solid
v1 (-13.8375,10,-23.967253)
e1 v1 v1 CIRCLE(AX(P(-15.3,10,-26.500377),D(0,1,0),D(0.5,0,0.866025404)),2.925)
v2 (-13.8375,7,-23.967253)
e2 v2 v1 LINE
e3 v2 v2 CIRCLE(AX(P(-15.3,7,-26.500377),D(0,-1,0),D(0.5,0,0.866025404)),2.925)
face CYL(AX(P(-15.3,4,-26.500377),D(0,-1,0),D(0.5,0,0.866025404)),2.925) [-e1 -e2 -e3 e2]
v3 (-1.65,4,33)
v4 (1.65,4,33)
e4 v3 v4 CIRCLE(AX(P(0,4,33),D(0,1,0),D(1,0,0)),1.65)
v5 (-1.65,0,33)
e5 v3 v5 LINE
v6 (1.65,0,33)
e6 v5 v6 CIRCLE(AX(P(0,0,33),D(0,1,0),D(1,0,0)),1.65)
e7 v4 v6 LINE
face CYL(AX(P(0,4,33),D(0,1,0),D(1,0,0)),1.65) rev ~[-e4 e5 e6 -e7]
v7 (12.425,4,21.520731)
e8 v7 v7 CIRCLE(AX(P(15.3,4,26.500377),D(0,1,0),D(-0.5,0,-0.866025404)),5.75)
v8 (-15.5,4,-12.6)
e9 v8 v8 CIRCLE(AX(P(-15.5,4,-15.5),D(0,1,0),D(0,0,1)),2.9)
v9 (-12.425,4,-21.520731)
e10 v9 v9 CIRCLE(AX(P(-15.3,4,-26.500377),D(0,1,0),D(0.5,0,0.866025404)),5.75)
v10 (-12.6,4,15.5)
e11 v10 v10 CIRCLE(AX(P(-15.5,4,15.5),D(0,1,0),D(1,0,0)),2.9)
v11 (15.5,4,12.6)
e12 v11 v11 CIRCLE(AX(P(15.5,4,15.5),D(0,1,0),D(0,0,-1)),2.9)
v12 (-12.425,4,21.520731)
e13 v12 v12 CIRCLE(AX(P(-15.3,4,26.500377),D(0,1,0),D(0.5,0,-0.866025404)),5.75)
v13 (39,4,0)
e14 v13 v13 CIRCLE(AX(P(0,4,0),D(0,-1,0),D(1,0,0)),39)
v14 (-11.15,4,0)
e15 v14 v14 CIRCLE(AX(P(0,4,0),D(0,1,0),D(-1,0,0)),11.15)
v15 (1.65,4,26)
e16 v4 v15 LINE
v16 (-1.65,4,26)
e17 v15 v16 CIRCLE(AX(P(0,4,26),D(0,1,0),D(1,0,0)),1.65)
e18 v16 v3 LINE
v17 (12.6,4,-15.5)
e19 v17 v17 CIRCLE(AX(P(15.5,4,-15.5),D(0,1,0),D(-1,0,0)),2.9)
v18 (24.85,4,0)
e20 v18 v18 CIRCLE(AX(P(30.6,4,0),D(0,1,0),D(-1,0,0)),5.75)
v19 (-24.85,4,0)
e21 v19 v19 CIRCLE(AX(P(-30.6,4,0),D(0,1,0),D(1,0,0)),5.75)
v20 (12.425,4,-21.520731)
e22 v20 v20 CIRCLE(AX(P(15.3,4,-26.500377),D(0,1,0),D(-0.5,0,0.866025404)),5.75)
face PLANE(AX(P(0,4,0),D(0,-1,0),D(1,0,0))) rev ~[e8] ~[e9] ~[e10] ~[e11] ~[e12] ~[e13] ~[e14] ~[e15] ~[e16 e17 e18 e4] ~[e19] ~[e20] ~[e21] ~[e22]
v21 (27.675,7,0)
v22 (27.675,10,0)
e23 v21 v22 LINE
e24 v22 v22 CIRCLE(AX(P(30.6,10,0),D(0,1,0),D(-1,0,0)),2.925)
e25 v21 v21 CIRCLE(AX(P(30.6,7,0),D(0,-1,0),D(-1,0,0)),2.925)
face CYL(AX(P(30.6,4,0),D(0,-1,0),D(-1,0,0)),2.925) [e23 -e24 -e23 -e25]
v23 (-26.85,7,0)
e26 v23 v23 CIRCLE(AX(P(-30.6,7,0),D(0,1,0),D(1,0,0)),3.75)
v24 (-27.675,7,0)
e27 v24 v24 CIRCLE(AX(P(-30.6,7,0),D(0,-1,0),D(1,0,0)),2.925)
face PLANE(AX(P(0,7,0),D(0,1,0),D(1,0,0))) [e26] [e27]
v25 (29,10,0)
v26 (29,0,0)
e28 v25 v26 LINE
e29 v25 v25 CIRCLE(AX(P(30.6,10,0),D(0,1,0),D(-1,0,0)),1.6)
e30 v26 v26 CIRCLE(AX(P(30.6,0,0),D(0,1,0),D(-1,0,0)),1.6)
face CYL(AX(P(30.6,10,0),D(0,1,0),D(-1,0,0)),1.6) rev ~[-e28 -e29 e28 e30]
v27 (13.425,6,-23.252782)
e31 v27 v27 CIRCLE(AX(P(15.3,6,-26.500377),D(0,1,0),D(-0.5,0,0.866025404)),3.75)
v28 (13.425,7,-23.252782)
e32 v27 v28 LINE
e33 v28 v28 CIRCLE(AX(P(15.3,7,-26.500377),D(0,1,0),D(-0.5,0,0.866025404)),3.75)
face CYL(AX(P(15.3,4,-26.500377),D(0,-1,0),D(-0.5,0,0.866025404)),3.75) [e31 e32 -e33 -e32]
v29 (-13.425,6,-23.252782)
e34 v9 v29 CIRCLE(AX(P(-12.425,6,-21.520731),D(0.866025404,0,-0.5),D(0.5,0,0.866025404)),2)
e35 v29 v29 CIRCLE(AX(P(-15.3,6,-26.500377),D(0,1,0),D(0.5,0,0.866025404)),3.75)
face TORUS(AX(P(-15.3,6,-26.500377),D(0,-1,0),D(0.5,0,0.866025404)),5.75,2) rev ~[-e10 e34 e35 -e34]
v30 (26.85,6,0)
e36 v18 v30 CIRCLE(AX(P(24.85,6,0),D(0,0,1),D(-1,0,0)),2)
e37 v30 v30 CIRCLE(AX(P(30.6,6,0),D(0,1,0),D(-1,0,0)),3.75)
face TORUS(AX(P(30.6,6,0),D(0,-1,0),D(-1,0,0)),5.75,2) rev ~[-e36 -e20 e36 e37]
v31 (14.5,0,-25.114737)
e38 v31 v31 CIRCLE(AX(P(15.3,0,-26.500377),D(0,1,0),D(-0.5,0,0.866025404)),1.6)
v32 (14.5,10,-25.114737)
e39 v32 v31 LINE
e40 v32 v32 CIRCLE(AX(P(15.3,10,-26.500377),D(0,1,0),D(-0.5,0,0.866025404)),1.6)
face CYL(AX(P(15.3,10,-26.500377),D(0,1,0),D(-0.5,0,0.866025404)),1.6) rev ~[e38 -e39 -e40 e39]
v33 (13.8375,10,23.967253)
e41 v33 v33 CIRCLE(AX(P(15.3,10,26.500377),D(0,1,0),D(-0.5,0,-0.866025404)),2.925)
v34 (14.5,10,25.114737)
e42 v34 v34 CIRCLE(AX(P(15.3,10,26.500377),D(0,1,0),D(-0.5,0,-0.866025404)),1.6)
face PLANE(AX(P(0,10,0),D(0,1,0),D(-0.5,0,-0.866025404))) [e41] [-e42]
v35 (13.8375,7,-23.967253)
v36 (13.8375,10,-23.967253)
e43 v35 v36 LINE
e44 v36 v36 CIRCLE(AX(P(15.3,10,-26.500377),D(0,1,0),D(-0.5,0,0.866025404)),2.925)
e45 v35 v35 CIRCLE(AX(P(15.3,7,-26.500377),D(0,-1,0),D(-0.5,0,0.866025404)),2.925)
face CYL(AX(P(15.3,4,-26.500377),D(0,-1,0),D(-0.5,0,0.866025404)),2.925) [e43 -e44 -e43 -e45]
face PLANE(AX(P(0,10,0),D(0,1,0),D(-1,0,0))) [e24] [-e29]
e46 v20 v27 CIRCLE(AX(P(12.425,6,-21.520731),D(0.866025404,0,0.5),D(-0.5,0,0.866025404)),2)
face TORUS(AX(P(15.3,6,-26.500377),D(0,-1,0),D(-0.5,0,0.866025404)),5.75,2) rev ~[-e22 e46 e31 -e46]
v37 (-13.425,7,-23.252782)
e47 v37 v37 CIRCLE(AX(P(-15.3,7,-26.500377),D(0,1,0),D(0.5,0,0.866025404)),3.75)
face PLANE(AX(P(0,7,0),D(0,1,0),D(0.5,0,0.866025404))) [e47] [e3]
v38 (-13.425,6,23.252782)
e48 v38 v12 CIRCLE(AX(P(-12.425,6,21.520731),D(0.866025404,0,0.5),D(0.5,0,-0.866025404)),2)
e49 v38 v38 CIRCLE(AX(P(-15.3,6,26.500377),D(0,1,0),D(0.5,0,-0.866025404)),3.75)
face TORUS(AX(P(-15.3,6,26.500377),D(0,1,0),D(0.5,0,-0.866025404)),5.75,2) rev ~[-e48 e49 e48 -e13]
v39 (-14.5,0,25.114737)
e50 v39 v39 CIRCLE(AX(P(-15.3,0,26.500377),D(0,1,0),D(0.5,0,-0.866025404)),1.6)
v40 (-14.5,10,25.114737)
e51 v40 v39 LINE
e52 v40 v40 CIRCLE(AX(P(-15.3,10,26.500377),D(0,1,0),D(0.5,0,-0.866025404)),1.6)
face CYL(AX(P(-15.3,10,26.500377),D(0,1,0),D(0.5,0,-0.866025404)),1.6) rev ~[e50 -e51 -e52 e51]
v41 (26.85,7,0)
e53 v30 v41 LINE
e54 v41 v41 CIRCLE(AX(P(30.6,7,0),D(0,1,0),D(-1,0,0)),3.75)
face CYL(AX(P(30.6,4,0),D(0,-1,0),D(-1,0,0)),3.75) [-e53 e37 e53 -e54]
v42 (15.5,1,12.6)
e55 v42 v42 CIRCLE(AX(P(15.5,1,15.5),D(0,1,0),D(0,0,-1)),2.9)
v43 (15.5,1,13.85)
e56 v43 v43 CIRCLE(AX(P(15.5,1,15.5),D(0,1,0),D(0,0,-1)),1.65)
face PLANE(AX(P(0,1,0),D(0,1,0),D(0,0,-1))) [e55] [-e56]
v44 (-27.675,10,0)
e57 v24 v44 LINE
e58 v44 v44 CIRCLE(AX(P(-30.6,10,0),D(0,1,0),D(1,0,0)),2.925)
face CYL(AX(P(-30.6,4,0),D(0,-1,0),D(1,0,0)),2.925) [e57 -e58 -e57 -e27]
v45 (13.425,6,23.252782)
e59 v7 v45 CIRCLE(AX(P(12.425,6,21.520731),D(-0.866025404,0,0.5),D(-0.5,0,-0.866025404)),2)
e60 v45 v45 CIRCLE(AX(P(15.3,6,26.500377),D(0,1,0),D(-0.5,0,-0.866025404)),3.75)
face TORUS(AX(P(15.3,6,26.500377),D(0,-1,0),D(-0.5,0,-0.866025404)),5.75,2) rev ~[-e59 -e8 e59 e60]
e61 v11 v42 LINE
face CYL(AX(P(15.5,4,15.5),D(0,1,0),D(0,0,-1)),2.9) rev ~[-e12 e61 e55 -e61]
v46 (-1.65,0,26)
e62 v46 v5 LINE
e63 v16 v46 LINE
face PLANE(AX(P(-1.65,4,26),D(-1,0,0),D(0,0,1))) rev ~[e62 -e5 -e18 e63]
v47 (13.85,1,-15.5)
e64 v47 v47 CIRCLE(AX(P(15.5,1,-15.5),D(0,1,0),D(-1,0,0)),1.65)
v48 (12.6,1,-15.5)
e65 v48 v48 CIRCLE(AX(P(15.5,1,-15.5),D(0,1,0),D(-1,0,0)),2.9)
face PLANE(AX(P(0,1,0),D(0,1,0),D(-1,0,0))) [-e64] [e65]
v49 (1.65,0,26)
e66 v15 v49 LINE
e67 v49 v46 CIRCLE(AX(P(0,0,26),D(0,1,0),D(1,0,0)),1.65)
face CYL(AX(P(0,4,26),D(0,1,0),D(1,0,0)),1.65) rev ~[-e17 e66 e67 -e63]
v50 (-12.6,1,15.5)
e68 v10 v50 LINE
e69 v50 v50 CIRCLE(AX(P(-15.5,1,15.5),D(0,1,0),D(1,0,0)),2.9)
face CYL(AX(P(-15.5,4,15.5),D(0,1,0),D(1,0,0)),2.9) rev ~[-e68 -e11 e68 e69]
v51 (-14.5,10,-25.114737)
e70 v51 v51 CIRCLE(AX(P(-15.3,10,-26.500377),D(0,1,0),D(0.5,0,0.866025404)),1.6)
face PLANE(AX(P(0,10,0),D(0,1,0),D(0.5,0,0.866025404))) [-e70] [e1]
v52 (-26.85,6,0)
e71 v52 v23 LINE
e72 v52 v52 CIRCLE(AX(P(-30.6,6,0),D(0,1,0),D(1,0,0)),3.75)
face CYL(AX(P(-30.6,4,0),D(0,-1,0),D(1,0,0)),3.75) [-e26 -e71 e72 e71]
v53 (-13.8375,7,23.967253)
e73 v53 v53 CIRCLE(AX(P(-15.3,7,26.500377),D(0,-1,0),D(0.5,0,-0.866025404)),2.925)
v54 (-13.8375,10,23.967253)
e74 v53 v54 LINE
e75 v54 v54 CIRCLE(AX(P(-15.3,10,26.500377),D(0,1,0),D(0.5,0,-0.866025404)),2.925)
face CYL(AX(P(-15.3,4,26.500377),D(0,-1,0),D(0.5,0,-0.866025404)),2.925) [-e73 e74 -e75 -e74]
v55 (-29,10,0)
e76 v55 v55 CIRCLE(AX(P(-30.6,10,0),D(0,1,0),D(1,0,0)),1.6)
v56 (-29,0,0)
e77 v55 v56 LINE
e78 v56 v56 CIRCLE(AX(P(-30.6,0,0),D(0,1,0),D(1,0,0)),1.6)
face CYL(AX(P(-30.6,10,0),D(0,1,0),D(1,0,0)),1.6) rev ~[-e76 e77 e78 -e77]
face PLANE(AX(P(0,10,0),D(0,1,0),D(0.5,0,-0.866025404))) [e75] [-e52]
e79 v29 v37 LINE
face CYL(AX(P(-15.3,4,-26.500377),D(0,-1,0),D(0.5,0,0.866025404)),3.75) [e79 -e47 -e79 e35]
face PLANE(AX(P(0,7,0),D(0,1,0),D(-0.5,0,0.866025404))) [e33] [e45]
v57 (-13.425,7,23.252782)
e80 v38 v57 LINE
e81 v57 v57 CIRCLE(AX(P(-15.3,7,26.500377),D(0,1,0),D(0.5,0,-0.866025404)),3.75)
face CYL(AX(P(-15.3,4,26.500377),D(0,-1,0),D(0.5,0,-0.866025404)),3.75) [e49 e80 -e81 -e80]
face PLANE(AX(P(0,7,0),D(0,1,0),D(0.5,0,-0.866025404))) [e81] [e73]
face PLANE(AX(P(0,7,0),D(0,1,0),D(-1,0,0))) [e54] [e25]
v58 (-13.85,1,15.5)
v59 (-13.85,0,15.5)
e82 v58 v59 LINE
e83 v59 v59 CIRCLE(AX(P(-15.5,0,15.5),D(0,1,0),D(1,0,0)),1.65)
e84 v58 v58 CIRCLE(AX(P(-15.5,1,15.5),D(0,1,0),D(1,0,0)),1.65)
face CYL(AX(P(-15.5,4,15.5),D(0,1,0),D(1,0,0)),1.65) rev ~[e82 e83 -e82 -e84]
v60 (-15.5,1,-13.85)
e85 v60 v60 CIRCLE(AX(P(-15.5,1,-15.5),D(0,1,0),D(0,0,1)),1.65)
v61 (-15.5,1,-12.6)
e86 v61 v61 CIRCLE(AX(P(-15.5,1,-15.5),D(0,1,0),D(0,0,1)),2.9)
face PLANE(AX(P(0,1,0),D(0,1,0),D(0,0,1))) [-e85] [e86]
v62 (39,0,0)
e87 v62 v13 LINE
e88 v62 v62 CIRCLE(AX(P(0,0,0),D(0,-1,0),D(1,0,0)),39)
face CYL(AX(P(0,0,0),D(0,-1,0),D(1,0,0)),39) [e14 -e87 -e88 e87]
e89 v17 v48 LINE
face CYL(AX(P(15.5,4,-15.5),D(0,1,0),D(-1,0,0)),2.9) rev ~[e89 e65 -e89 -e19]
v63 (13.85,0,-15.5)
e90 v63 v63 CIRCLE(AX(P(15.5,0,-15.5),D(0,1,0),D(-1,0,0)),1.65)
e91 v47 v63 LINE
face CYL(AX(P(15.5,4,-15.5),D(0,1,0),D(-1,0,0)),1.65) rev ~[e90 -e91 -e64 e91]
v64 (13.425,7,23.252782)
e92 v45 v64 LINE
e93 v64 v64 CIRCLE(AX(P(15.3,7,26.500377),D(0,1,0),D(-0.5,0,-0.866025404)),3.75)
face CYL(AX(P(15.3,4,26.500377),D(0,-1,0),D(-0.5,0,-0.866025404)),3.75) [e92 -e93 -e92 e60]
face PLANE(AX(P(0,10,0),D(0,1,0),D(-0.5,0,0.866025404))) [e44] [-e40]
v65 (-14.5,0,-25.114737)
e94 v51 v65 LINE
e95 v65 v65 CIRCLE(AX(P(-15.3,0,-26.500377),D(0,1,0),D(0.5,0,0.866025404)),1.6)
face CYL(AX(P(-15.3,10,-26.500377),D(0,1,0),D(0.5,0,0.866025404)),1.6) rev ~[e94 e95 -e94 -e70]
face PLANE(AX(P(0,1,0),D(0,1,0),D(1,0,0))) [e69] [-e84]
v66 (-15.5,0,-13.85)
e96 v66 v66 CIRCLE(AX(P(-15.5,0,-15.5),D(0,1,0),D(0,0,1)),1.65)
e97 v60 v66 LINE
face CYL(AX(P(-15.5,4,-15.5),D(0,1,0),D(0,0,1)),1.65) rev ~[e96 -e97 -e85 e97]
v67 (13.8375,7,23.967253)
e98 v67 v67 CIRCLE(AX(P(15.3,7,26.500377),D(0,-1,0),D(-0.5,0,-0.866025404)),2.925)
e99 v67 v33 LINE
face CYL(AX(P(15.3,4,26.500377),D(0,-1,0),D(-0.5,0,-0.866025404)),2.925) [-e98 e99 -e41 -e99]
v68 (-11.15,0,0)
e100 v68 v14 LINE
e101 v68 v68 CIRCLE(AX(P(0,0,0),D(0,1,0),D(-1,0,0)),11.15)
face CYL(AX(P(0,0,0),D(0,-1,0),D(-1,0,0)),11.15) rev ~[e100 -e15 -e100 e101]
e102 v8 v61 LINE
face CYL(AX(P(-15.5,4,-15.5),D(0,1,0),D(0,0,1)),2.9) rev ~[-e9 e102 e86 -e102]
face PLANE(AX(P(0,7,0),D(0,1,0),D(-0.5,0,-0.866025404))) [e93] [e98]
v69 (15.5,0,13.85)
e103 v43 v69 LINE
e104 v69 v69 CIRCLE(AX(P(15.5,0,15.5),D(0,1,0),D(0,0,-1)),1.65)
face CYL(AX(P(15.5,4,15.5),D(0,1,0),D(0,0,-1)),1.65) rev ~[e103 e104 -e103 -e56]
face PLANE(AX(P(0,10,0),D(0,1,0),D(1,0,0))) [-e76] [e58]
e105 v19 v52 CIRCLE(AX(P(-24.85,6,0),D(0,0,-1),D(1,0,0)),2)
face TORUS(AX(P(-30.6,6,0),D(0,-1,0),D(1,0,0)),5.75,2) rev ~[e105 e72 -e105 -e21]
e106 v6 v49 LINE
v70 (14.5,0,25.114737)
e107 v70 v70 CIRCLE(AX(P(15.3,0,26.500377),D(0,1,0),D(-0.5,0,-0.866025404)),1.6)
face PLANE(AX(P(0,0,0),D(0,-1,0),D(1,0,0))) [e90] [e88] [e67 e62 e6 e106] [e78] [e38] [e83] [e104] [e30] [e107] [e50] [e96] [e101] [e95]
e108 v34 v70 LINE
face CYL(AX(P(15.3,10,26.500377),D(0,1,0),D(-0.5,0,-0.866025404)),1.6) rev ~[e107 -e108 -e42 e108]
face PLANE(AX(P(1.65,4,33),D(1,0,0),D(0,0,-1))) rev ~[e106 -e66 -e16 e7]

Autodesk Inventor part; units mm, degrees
ref_plane "YZ Plane" through (0, 0, 0) normal (1, 0, 0) x (0, 1, 0)
ref_plane "XZ Plane" through (0, 0, 0) normal (0, 1, 0) x (-1, 0, 0)
ref_plane "XY Plane" through (0, 0, 0) normal (0, 0, 1) x (1, 0, 0)
sketch "Boceto1" plane through (0, 0, 0) normal (0, 1, 0) x (-1, 0, 0)
  circle A0 centre (0, 0) radius 11.15
  line L0 (-40, 40) -> (40, 40)
  line L1 (40, 40) -> (40, -40)
  line L2 (40, -40) -> (-40, -40)
  line L3 (-40, -40) -> (-40, 40)
  line L4 (-40, 40) -> (40, -40) construction
  line L5 (40, 40) -> (-40, -40) construction
  dimension "d0" = 22.3
  dimension "d1" = 80
  dimension "d2" = 80
extrude "Extrusión1" add sketch "Boceto1" along normal blind 4
sketch "Boceto2" plane through (0, 4, 0) normal (0, 1, 0) x (1, 0, 0)
  circle A0 centre (-15.5, -15.5) radius 1.65
  point P0 (0, 0)
  dimension "d5" = 15.5
  dimension "d6" = 15.5
  dimension "d7" = 3.3
extrude "Extrusión2" cut sketch "Boceto2" against normal through all
pattern_circular "Patrón circular1" count 4 over 360 about axis through (0, 0, 0) along (0, 1, 0) of "Extrusión2"
chamfer "Chaflán1" distance 1.5 angle 45 4 edges at (-17.15, 4, 15.5) (-15.5, 4, -17.15) (17.15, 4, -15.5) (15.5, 4, 17.15)
sketch "Boceto3" plane through (0, 4, 0) normal (0, 1, 0) x (1, 0, 0)
  circle A0 centre (-30.6, 0) radius 2.925
  point P0 (0, 0)
  dimension "d16" = 5.85
  dimension "d17" = 30.6
extrude "Extrusión3" add sketch "Boceto3" along normal blind 6
sketch "Boceto4" plane through (0, 4, 0) normal (0, 1, 0) x (1, 0, 0)
  circle A0 centre (-30.6, 0) radius 2.925 projected
  circle A1 centre (-30.6, 0) radius 3.75
  point P0 (0, 0)
  point P1 (-30, -3.9)
  point P2 (-30, 3.9)
  dimension "d20" = 7.5
extrude "Extrusión4" add sketch "Boceto4" along normal blind 3 contours A0 | A1
fillet "Empalme1" radius 2 1 edges at (-34.35, 4, 0)
pattern_circular "Patrón circular2" count 6 over 360 about axis through (0, 0, 0) along (0, 1, 0) of "Extrusión3", "Empalme1", "Extrusión4"
sketch "Boceto5" plane through (0, 4, 0) normal (0, 1, 0) x (1, 0, 0)
  circle A0 centre (0, 0) radius 36.5
  circle A1 centre (15.3, 26.5004) radius 5.75 projected
  circle A2 centre (15.3, -26.5004) radius 5.75 projected
  circle A3 centre (-30.6, 0) radius 5.75 projected
  circle A4 centre (15.5, 15.5) radius 3.15 projected
  circle A5 centre (-15.5, -15.5) radius 3.15 projected
  line L0 (40, 40) -> (-40, 40) projected
  line L1 (-40, 40) -> (-40, -40) projected
  line L2 (-40, -40) -> (40, -40) projected
  line L3 (40, -40) -> (40, 40) projected
  circle A6 centre (0, 0) radius 11.15 projected
  circle A7 centre (-15.5, 15.5) radius 3.15 projected
  circle A8 centre (15.5, -15.5) radius 3.15 projected
  circle A9 centre (-15.3, -26.5004) radius 5.75 projected
  circle A10 centre (30.6, 0) radius 5.75 projected
  dimension "d27" = 73
extrude "Extrusión5" cut sketch "Boceto5" against normal through all contours L3 L2 L1 L0
sketch "Boceto6" plane through (0, 4, 0) normal (0, 1, 0) x (1, 0, 0)
  circle A0 centre (0, -33) radius 1.65
  line L0 (-1.65, -33) -> (1.65, -33)
  line L1 (1.65, -33) -> (1.65, -26)
  line L2 (1.65, -26) -> (-1.65, -26)
  line L3 (-1.65, -26) -> (-1.65, -33)
  circle A1 centre (0, -26) radius 1.65
  point P0 (0, 0)
  point P1 (-1.65, -26)
  dimension "d30" = 3.3
  dimension "d31" = 7
  dimension "d32" = 26
extrude "Extrusión6" cut sketch "Boceto6" against normal through all
sketch "Boceto7" plane through (-30.6, 10, 0) normal (0, 1, 0) x (1, 0, 0)
  circle A0 centre (0, 0) radius 1.6
  point P0 (30.6, 0)
  dimension "d35" = 3.2
extrude "Extrusión7" cut sketch "Boceto7" against normal through all
pattern_circular "Patrón circular3" count 6 over 360 about axis through (0, 0, 0) along (0, 1, 0) of "Extrusión7"
sketch "Boceto8" plane through (0, 0, 0) normal (0, -1, 0) x (1, 0, 0)
  circle A0 centre (-15.3, 26.5004) radius 1.6 projected
  circle A1 centre (-15.3, 26.5004) radius 2.85
  line L0 (-12.45, 28.1458) -> (-12.45, 24.8549)
  line L1 (-12.45, 24.8549) -> (-15.3, 23.2095)
  line L2 (-15.3, 23.2095) -> (-18.15, 24.8549)
  line L3 (-18.15, 24.8549) -> (-18.15, 28.1458)
  line L4 (-18.15, 28.1458) -> (-15.3, 29.7913)
  line L5 (-15.3, 29.7913) -> (-12.45, 28.1458)
  line L6 (-24.8914, 27.7755) -> (-11.6086, 35.4444)
  circle A2 centre (0, 0) radius 36.5 projected
  line L7 (-15.3, 26.5004) -> (-18.25, 31.6099)
  dimension "d41" = 5.7
extrude "Extrusión8" [suppressed]
pattern_circular "Patrón circular4" [suppressed]
sketch "Boceto9" plane through (0, 4, 0) normal (0, 1, 0) x (1, 0, 0)
  circle A0 centre (-15.5, -15.5) radius 3.15 projected
  circle A1 centre (-15.5, -15.5) radius 1.65
  point P0 (0, 0)
  dimension "d47" = 3.3
extrude "Extrusión9" add sketch "Boceto9" against normal up to surface (4 mm away)
pattern_circular "Patrón circular5" count 4 over 360 about axis through (0, 0, 0) along (0, 1, 0) of "Extrusión9"
sketch "Boceto10" plane through (0, 4, 0) normal (0, 1, 0) x (1, 0, 0)
  circle A0 centre (-26, 15.0111) radius 2.15
  line L0 (0, 0) -> (-35.1199, 0)
  line L1 (0, 0) -> (-26, 15.0111)
  circle A1 centre (-26, -15.011) radius 2.15
  circle A2 centre (26, 15.0111) radius 2.15
  circle A3 centre (26, -15.011) radius 2.15
  dimension "d53" = 30
  dimension "d54" = 4.3
  dimension "d55" = 26
  dimension "d56" = 26
  dimension "d57" = 15.011
extrude "Extrusión10" [suppressed]
sketch "Boceto12" plane through (0, 0, 0) normal (0, -1, 0) x (1, 0, 0)
  circle A0 centre (0, 0) radius 36.5 projected
  circle A1 centre (0, 0) radius 39
  dimension "d61" = 78
extrude "Extrusión11" add sketch "Boceto12" against normal up to surface (4 mm away)
sketch "Boceto13" plane through (0, 4, 0) normal (0, 1, 0) x (1, 0, 0)
  circle A0 centre (-15.5, -15.5) radius 1.65 projected
  circle A1 centre (-15.5, -15.5) radius 2.9
  point P0 (0, 0)
  dimension "d64" = 5.8
extrude "Extrusión12" cut sketch "Boceto13" against normal blind 3 contours A0 | A1
pattern_circular "Patrón circular6" count 4 over 360 about axis through (0, 0, 0) along (0, 1, 0) of "Extrusión12"
properties part number "Motorsupport"
